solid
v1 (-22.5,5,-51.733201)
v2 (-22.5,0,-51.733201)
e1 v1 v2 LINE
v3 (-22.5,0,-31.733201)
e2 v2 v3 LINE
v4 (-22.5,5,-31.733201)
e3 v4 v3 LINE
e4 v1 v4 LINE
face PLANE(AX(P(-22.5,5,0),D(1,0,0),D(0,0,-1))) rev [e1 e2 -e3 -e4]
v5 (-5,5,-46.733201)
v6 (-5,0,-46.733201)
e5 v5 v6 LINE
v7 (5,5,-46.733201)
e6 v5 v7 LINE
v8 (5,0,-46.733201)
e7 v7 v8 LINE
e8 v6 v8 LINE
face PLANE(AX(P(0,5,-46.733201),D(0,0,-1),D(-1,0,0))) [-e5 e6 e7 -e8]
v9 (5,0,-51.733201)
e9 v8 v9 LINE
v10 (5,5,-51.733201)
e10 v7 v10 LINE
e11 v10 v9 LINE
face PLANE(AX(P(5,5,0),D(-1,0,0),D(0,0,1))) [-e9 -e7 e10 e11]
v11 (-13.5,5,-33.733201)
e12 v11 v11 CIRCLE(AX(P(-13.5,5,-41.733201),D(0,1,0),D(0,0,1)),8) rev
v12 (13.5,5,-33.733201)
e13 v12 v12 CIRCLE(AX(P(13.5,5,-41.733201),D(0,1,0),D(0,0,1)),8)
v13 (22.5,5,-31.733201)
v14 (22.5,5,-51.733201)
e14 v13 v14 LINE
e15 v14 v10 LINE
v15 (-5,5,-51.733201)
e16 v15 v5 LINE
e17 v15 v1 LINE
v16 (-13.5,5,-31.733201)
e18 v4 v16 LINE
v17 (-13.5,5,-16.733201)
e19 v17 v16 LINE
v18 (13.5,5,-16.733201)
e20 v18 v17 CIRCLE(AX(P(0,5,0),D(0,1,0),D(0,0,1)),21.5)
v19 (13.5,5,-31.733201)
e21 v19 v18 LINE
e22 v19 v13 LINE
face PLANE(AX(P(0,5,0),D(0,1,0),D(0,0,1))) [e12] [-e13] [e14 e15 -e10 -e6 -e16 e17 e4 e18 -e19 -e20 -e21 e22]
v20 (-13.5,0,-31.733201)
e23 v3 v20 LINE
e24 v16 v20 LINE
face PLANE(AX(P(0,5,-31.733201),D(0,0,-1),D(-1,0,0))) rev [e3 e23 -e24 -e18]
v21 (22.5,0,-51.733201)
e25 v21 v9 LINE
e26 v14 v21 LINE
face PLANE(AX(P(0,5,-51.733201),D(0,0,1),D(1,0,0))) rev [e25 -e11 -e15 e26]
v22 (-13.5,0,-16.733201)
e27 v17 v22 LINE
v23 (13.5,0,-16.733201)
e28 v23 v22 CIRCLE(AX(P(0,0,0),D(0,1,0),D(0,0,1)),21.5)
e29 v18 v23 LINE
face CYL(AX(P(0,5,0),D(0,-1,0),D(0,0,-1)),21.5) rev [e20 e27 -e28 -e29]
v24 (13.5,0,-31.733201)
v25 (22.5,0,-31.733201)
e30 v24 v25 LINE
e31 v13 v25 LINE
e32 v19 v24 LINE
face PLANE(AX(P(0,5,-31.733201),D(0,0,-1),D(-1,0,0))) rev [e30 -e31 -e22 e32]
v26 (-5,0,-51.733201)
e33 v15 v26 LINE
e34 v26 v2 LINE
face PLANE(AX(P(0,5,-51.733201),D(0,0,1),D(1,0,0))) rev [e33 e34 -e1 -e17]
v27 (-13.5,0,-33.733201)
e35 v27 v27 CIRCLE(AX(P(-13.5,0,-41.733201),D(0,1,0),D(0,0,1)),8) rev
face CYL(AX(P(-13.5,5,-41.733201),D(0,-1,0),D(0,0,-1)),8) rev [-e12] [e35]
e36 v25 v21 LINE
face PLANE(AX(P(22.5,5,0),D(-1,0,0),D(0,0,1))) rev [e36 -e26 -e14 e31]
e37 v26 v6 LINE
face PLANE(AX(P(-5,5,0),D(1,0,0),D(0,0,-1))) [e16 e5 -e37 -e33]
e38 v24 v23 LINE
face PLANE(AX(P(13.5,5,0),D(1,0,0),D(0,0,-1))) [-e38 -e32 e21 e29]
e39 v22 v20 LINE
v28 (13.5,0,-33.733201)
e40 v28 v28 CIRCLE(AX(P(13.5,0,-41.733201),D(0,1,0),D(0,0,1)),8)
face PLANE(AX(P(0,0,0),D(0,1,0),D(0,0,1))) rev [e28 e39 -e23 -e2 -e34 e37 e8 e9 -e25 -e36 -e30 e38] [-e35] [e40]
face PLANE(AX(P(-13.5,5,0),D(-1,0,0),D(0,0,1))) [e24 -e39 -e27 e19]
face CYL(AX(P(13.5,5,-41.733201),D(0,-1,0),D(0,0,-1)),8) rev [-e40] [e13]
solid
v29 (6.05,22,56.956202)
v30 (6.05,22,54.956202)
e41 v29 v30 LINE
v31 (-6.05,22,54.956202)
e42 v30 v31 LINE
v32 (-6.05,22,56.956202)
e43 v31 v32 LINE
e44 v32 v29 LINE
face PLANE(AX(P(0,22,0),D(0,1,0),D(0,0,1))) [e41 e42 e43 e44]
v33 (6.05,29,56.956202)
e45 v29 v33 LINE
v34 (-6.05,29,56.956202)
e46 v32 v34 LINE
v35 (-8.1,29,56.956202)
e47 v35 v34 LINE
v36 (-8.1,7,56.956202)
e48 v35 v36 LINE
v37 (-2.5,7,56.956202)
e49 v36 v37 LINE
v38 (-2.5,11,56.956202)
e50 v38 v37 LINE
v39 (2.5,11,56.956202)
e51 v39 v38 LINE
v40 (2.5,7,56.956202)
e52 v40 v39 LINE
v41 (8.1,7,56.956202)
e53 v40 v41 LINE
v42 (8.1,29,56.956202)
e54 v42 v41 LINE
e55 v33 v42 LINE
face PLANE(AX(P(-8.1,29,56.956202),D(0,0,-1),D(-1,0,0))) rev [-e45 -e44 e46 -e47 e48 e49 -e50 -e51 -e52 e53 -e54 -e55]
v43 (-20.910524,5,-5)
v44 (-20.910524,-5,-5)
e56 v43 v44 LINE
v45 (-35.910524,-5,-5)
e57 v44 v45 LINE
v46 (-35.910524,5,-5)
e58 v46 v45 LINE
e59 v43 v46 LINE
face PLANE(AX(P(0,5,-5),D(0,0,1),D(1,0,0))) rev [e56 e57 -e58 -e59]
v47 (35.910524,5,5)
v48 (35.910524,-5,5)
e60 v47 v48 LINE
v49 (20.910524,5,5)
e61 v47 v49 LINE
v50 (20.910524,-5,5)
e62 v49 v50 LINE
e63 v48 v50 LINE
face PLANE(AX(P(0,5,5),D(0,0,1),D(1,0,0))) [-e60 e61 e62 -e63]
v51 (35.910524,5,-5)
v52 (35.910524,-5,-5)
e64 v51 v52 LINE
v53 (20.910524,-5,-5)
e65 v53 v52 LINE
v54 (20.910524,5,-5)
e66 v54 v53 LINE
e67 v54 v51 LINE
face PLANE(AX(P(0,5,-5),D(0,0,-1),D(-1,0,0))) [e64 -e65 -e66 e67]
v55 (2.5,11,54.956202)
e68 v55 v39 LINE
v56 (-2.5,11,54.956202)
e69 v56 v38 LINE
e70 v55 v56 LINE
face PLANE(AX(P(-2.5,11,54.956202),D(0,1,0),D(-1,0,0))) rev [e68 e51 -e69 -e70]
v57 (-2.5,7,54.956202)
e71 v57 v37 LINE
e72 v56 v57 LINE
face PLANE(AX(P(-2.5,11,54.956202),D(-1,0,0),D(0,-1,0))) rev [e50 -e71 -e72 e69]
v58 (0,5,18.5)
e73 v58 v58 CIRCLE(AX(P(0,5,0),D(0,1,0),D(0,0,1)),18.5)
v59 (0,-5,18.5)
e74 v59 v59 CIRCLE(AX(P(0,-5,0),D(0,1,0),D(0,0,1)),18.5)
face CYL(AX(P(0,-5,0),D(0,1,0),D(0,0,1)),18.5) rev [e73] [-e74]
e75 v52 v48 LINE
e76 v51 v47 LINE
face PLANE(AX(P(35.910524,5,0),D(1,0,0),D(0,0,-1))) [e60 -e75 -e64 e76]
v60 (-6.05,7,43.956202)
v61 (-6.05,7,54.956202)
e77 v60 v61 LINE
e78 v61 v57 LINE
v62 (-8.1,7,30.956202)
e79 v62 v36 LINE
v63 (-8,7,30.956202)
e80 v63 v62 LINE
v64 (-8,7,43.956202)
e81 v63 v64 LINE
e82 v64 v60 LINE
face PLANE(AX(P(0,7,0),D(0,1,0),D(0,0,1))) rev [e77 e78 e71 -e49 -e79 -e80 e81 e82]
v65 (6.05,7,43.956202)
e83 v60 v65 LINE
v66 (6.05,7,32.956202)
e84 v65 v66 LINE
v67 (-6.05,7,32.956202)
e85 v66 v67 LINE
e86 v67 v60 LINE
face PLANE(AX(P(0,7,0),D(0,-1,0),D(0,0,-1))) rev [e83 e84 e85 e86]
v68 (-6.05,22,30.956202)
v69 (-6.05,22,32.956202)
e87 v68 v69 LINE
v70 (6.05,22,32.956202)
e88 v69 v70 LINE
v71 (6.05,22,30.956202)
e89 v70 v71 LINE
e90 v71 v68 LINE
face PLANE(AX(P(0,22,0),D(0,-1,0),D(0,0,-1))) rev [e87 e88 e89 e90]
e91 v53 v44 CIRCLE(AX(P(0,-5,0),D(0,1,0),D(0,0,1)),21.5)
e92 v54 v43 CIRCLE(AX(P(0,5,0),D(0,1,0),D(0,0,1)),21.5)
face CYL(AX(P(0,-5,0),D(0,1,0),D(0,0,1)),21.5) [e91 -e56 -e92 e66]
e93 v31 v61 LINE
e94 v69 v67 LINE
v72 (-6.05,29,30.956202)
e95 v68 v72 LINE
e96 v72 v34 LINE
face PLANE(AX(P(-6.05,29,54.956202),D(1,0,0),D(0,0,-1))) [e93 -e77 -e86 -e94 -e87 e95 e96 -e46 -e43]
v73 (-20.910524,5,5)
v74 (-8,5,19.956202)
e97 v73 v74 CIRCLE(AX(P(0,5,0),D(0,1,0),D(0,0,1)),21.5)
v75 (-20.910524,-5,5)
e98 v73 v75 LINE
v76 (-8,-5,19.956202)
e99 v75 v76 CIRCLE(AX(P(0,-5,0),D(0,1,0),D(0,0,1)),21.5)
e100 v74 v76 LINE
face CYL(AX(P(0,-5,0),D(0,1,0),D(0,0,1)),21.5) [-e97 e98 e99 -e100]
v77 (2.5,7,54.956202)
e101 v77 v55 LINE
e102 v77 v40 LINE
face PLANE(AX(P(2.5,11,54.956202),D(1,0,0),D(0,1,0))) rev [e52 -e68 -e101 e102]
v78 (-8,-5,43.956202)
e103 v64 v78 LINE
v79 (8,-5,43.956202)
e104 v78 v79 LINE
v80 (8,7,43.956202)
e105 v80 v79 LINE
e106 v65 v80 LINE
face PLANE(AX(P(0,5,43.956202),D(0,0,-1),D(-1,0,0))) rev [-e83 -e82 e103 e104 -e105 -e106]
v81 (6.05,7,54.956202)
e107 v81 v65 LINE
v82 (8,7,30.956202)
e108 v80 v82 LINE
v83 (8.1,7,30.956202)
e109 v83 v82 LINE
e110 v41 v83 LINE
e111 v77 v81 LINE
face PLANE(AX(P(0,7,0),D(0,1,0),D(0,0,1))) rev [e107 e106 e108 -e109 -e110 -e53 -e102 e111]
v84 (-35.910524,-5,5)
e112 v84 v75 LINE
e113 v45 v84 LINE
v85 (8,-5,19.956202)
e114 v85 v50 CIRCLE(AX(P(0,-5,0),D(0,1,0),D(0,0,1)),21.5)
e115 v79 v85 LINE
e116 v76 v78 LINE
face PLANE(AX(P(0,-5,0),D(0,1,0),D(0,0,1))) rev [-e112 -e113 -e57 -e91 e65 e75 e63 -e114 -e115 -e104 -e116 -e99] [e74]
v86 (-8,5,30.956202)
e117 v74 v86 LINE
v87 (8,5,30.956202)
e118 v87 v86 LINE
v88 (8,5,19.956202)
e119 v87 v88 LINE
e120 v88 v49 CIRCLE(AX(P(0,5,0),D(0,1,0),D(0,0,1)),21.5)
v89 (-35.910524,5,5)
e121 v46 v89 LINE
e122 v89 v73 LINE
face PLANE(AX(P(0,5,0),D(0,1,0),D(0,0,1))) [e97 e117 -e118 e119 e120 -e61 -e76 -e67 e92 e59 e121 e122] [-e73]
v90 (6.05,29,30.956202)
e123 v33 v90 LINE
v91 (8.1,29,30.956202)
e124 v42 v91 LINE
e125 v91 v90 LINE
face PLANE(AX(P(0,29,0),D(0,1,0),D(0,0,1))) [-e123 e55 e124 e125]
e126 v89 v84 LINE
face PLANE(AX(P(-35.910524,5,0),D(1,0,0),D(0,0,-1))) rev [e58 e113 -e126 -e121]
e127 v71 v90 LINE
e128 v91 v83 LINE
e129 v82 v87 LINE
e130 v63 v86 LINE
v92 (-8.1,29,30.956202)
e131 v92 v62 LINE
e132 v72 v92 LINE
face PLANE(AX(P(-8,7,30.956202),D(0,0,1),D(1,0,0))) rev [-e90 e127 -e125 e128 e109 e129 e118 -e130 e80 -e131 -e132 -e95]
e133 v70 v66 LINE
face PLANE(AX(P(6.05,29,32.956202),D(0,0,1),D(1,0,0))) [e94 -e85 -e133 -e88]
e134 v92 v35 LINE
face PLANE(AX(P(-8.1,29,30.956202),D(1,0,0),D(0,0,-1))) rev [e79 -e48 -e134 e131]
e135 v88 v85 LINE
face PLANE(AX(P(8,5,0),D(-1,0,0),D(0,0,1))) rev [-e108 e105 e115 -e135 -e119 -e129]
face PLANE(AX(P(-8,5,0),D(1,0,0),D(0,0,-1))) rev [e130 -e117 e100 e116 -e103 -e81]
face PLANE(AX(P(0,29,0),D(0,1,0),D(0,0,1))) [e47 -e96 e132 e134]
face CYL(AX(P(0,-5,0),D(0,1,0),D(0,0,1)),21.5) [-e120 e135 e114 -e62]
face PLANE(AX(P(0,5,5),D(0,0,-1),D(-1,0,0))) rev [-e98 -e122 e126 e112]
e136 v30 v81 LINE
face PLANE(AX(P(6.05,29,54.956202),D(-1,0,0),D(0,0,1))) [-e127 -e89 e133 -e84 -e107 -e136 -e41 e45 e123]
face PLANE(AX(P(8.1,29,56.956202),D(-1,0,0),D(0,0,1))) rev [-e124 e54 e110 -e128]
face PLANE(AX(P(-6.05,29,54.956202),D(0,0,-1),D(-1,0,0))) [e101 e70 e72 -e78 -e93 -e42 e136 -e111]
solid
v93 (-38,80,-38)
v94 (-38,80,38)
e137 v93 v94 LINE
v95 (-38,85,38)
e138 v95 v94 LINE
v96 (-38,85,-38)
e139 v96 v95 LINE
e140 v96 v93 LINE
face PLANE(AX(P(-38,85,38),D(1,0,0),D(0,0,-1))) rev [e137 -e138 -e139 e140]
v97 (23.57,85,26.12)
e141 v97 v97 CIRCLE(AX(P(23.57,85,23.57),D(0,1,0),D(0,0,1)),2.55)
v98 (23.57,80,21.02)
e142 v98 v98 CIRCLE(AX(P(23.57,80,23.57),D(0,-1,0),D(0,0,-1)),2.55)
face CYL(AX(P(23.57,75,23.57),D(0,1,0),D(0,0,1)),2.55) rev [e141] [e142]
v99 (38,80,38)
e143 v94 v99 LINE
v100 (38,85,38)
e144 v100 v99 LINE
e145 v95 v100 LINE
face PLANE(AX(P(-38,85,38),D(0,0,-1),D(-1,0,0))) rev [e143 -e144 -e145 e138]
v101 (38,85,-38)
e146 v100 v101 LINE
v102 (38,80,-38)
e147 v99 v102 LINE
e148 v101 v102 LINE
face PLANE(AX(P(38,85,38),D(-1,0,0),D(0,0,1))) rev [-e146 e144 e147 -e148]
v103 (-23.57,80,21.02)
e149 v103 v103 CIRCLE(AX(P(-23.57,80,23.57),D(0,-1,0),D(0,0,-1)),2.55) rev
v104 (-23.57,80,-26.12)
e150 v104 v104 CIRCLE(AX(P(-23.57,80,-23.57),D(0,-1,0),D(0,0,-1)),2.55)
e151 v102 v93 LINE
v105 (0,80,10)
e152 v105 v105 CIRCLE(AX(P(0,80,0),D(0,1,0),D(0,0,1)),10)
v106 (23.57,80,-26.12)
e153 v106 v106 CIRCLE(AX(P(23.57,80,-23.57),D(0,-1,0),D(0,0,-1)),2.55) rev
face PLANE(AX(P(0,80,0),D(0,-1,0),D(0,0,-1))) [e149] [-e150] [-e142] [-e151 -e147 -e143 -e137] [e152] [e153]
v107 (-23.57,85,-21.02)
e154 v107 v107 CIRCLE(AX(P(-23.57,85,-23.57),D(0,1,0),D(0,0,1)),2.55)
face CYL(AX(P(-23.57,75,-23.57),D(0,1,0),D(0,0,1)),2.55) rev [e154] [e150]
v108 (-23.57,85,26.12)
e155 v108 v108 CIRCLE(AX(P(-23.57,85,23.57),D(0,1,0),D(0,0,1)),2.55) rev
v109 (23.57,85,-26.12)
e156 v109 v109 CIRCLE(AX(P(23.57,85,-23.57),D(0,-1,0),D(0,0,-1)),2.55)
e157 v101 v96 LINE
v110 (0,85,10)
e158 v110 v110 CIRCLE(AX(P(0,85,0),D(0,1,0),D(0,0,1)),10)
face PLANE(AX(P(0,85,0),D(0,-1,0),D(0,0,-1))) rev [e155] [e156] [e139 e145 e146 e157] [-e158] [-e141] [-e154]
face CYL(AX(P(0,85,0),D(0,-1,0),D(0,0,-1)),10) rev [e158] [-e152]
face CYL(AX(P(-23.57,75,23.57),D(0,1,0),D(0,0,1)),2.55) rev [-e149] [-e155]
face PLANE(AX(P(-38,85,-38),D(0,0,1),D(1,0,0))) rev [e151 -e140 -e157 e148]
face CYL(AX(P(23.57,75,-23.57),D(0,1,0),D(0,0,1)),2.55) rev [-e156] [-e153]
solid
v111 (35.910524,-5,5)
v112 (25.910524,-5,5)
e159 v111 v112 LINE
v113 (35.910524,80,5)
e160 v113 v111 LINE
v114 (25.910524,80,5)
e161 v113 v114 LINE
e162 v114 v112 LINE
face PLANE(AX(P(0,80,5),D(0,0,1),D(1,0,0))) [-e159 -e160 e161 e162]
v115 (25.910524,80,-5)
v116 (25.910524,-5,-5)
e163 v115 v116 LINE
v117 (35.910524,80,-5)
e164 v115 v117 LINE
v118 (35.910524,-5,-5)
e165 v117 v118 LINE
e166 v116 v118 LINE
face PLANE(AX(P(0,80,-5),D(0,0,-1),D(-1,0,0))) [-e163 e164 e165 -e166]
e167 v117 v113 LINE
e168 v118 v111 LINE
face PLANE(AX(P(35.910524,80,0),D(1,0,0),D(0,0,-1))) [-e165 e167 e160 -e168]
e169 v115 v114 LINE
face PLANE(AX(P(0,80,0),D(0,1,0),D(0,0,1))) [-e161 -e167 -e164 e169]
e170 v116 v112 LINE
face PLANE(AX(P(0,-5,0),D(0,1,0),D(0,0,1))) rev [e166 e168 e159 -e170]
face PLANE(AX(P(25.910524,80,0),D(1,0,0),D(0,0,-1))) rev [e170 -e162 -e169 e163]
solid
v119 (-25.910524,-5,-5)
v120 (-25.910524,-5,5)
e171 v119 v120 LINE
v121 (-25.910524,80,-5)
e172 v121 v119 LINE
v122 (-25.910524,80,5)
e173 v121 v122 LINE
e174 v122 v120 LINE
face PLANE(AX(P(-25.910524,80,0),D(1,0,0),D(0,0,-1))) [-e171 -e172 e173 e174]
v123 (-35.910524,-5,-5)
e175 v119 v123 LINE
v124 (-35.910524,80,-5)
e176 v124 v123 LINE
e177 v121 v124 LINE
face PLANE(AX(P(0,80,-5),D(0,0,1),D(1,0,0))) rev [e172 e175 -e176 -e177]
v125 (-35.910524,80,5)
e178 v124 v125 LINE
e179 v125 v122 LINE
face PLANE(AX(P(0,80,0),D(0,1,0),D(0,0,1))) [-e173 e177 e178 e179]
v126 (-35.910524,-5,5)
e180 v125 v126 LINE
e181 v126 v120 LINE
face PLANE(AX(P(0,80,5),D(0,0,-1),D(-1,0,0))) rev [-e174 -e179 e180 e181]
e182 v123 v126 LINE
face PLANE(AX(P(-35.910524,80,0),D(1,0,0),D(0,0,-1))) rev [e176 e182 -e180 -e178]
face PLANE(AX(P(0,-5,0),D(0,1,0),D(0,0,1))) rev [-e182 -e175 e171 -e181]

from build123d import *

# Parameters (mm, degrees)
CONNECTOR_SLEEVE_DEPTH      = 5
CONNECTOR_SLEEVE_DEPTH_BACK = 5
SKETCH2_R                   = 18.5
SKETCH2_10_R                = 8
SENSOR_HOLDER_DEPTH         = 5
ARMS_START                  = -5
SKETCH2_18_W                = 10
SKETCH2_18_H                = 10
ARMS_DEPTH                  = 85
ARMS_2_DEPTH                = 85
ARMS2_START                 = -5
ARMS2_DEPTH                 = 10
SERVOHOLDER_START           = -5
SERVOHOLDER_DEPTH           = 10
SKETCH31_W                  = 16
SKETCH31_H                  = 13
SERVOHOLDER2_DEPTH          = 2
SKETCH33_W                  = 16.2
SKETCH33_H                  = 26
SKETCH33_W_2                = 12.1
SKETCH33_H_2                = 22
SERVOHOLDER3_DEPTH          = 22
SERVOHOLDER4_W              = 12.1
SERVOHOLDER4_H              = 2
SERVOGROOVES_DEPTH          = 7
SKETCH36_W                  = 5
SKETCH36_H                  = 4
SERVOWIRING_DEPTH           = 2
SKETCH4_W                   = 76
SKETCH4_H                   = 76
SKETCH4_R                   = 10
MOTOR_ENCLOSURE_DEPTH       = 5
SKETCH6_R                   = 2.55
CUT_EXTRUDE1_DEPTH          = 10


with BuildPart() as part:
    # Sketch2 → Connector sleeve (new, two sides: drawn at the far end of the back side and taken through both)
    with BuildSketch(Plane(origin=(0, 0, 0), x_dir=(1, 0, 0), z_dir=(0, 1, 0)).offset(-CONNECTOR_SLEEVE_DEPTH_BACK)):
        with BuildLine():
            ThreePointArc((-13.5, 16.733200531), (-18.177954599, 11.480939273), (-20.910523666, 5))
            ThreePointArc((-20.910523666, 5), (-21.5, 0), (-20.910523666, -5))
            ThreePointArc((-20.910523666, -5), (-16.275029633, -14.048964746), (-8, -19.956202043))
            ThreePointArc((-8, -19.956202043), (0, -21.5), (8, -19.956202043))
            ThreePointArc((8, -19.956202043), (16.275029633, -14.048964746), (20.910523666, -5))
            ThreePointArc((20.910523666, -5), (21.352122363, -2.517314161), (21.5, 0))
            ThreePointArc((21.5, 0), (21.352122363, 2.517314161), (20.910523666, 5))
            ThreePointArc((20.910523666, 5), (18.177954599, 11.480939273), (13.5, 16.733200531))
            ThreePointArc((13.5, 16.733200531), (0, 21.5), (-13.5, 16.733200531))
        make_face()
        Circle(SKETCH2_R, mode=Mode.SUBTRACT)
    extrude(amount=CONNECTOR_SLEEVE_DEPTH + CONNECTOR_SLEEVE_DEPTH_BACK)

    # Sketch2<22> → Arms2 (add)
    with BuildSketch(Plane(origin=(0, 0, 0), x_dir=(1, 0, 0), z_dir=(0, 1, 0)).offset(ARMS2_START)):
        with BuildLine():
            ThreePointArc((-20.910523666, -5), (-21.5, 0), (-20.910523666, 5))
            Line((-20.910523666, 5), (-35.910523666, 5))
            Line((-35.910523666, 5), (-35.910523666, -5))
            Line((-35.910523666, -5), (-20.910523666, -5))
        make_face()
        with BuildLine():
            ThreePointArc((20.910523666, 5), (21.5, 0), (20.910523666, -5))
            Line((20.910523666, -5), (35.910523666, -5))
            Line((35.910523666, -5), (35.910523666, 5))
            Line((35.910523666, 5), (20.910523666, 5))
        make_face()
    extrude(amount=ARMS2_DEPTH)

    # Sketch2<21> → Servoholder (add)
    with BuildSketch(Plane(origin=(0, 0, 0), x_dir=(1, 0, 0), z_dir=(0, 1, 0)).offset(SERVOHOLDER_START)):
        with BuildLine():
            ThreePointArc((8, -19.956202043), (0, -21.5), (-8, -19.956202043))
            Line((-8, -19.956202043), (-8, -43.956202043))
            Line((-8, -43.956202043), (8, -43.956202043))
            Line((8, -43.956202043), (8, -19.956202043))
        make_face()
    extrude(amount=SERVOHOLDER_DEPTH)

    # Sketch31 → Servoholder2 (add)
    with BuildSketch(Plane(origin=(0, 5, 0), x_dir=(1, 0, 0), z_dir=(0, 1, 0))):
        with Locations((0, -37.456202043)):
            Rectangle(SKETCH31_W, SKETCH31_H)
    extrude(amount=SERVOHOLDER2_DEPTH)

    # Sketch33 → Servoholder3 (add)
    with BuildSketch(Plane(origin=(0, 7, 0), x_dir=(1, 0, 0), z_dir=(0, 1, 0))):
        with Locations((0, -43.956202043)):
            Rectangle(SKETCH33_W, SKETCH33_H)
        with Locations((0, -43.956202043)):
            Rectangle(SKETCH33_W_2, SKETCH33_H_2, mode=Mode.SUBTRACT)
    extrude(amount=SERVOHOLDER3_DEPTH)

    # Servoholder4 → Servogrooves (cut)
    with BuildSketch(Plane(origin=(0, 29, 0), x_dir=(1, 0, 0), z_dir=(0, 1, 0))):
        with Locations((0, -31.956202043)):
            Rectangle(SERVOHOLDER4_W, SERVOHOLDER4_H)
        with Locations((0, -55.956202043)):
            Rectangle(SERVOHOLDER4_W, SERVOHOLDER4_H)
    extrude(amount=-SERVOGROOVES_DEPTH, mode=Mode.SUBTRACT)

    # Sketch36 → Servowiring (cut)
    with BuildSketch(Plane.XY.offset(56.956202043)):
        with Locations((0, 9)):
            Rectangle(SKETCH36_W, SKETCH36_H)
    extrude(amount=-SERVOWIRING_DEPTH, mode=Mode.SUBTRACT)


with BuildPart() as body_2:
    # Sketch2<10> → Sensor holder (new body)
    with BuildSketch(Plane(origin=(0, 0, 0), x_dir=(1, 0, 0), z_dir=(0, 1, 0))):
        with BuildLine():
            Line((-13.5, 31.733200531), (-13.5, 16.733200531))
            ThreePointArc((-13.5, 16.733200531), (0, 21.5), (13.5, 16.733200531))
            Line((13.5, 16.733200531), (13.5, 31.733200531))
            Line((13.5, 31.733200531), (22.5, 31.733200531))
            Line((22.5, 31.733200531), (22.5, 51.733200531))
            Line((22.5, 51.733200531), (5, 51.733200531))
            Line((5, 51.733200531), (5, 46.733200531))
            Line((5, 46.733200531), (-5, 46.733200531))
            Line((-5, 46.733200531), (-5, 51.733200531))
            Line((-5, 51.733200531), (-22.5, 51.733200531))
            Line((-22.5, 51.733200531), (-22.5, 31.733200531))
            Line((-22.5, 31.733200531), (-13.5, 31.733200531))
        make_face()
        with Locations((-13.5, 41.733200531)):
            Circle(SKETCH2_10_R, mode=Mode.SUBTRACT)
        with Locations((13.5, 41.733200531)):
            Circle(SKETCH2_10_R, mode=Mode.SUBTRACT)
    extrude(amount=SENSOR_HOLDER_DEPTH)


with BuildPart() as body_3:
    # Sketch2<18> → Arms (new body)
    with BuildSketch(Plane(origin=(0, 0, 0), x_dir=(1, 0, 0), z_dir=(0, 1, 0)).offset(ARMS_START)):
        with Locations((-30.910523666, 0)):
            Rectangle(SKETCH2_18_W, SKETCH2_18_H)
    extrude(amount=ARMS_DEPTH)


with BuildPart() as body_4:
    # Sketch2<18> → Arms 2 (new body)
    with BuildSketch(Plane(origin=(0, 0, 0), x_dir=(1, 0, 0), z_dir=(0, 1, 0)).offset(ARMS_START)):
        with Locations((30.910523666, 0)):
            Rectangle(SKETCH2_18_W, SKETCH2_18_H)
    extrude(amount=ARMS_2_DEPTH)


with BuildPart() as body_5:
    # Sketch4 → Motor enclosure (new body)
    with BuildSketch(Plane(origin=(0, 80, 0), x_dir=(1, 0, 0), z_dir=(0, 1, 0))):
        Rectangle(SKETCH4_W, SKETCH4_H)
        Circle(SKETCH4_R, mode=Mode.SUBTRACT)
    extrude(amount=MOTOR_ENCLOSURE_DEPTH)

    # Sketch6 → Cut-Extrude1 (cut)
    with BuildSketch(Plane(origin=(0, 85, 0), x_dir=(1, 0, 0), z_dir=(0, 1, 0))):
        with Locations((23.57, -23.57)):
            Circle(SKETCH6_R)
        with Locations((-23.57, -23.57)):
            Circle(SKETCH6_R)
        with Locations((-23.57, 23.57)):
            Circle(SKETCH6_R)
        with Locations((23.57, 23.57)):
            Circle(SKETCH6_R)
    extrude(amount=-CUT_EXTRUDE1_DEPTH, mode=Mode.SUBTRACT)


solid = Compound([part.part, body_2.part, body_3.part, body_4.part, body_5.part])
